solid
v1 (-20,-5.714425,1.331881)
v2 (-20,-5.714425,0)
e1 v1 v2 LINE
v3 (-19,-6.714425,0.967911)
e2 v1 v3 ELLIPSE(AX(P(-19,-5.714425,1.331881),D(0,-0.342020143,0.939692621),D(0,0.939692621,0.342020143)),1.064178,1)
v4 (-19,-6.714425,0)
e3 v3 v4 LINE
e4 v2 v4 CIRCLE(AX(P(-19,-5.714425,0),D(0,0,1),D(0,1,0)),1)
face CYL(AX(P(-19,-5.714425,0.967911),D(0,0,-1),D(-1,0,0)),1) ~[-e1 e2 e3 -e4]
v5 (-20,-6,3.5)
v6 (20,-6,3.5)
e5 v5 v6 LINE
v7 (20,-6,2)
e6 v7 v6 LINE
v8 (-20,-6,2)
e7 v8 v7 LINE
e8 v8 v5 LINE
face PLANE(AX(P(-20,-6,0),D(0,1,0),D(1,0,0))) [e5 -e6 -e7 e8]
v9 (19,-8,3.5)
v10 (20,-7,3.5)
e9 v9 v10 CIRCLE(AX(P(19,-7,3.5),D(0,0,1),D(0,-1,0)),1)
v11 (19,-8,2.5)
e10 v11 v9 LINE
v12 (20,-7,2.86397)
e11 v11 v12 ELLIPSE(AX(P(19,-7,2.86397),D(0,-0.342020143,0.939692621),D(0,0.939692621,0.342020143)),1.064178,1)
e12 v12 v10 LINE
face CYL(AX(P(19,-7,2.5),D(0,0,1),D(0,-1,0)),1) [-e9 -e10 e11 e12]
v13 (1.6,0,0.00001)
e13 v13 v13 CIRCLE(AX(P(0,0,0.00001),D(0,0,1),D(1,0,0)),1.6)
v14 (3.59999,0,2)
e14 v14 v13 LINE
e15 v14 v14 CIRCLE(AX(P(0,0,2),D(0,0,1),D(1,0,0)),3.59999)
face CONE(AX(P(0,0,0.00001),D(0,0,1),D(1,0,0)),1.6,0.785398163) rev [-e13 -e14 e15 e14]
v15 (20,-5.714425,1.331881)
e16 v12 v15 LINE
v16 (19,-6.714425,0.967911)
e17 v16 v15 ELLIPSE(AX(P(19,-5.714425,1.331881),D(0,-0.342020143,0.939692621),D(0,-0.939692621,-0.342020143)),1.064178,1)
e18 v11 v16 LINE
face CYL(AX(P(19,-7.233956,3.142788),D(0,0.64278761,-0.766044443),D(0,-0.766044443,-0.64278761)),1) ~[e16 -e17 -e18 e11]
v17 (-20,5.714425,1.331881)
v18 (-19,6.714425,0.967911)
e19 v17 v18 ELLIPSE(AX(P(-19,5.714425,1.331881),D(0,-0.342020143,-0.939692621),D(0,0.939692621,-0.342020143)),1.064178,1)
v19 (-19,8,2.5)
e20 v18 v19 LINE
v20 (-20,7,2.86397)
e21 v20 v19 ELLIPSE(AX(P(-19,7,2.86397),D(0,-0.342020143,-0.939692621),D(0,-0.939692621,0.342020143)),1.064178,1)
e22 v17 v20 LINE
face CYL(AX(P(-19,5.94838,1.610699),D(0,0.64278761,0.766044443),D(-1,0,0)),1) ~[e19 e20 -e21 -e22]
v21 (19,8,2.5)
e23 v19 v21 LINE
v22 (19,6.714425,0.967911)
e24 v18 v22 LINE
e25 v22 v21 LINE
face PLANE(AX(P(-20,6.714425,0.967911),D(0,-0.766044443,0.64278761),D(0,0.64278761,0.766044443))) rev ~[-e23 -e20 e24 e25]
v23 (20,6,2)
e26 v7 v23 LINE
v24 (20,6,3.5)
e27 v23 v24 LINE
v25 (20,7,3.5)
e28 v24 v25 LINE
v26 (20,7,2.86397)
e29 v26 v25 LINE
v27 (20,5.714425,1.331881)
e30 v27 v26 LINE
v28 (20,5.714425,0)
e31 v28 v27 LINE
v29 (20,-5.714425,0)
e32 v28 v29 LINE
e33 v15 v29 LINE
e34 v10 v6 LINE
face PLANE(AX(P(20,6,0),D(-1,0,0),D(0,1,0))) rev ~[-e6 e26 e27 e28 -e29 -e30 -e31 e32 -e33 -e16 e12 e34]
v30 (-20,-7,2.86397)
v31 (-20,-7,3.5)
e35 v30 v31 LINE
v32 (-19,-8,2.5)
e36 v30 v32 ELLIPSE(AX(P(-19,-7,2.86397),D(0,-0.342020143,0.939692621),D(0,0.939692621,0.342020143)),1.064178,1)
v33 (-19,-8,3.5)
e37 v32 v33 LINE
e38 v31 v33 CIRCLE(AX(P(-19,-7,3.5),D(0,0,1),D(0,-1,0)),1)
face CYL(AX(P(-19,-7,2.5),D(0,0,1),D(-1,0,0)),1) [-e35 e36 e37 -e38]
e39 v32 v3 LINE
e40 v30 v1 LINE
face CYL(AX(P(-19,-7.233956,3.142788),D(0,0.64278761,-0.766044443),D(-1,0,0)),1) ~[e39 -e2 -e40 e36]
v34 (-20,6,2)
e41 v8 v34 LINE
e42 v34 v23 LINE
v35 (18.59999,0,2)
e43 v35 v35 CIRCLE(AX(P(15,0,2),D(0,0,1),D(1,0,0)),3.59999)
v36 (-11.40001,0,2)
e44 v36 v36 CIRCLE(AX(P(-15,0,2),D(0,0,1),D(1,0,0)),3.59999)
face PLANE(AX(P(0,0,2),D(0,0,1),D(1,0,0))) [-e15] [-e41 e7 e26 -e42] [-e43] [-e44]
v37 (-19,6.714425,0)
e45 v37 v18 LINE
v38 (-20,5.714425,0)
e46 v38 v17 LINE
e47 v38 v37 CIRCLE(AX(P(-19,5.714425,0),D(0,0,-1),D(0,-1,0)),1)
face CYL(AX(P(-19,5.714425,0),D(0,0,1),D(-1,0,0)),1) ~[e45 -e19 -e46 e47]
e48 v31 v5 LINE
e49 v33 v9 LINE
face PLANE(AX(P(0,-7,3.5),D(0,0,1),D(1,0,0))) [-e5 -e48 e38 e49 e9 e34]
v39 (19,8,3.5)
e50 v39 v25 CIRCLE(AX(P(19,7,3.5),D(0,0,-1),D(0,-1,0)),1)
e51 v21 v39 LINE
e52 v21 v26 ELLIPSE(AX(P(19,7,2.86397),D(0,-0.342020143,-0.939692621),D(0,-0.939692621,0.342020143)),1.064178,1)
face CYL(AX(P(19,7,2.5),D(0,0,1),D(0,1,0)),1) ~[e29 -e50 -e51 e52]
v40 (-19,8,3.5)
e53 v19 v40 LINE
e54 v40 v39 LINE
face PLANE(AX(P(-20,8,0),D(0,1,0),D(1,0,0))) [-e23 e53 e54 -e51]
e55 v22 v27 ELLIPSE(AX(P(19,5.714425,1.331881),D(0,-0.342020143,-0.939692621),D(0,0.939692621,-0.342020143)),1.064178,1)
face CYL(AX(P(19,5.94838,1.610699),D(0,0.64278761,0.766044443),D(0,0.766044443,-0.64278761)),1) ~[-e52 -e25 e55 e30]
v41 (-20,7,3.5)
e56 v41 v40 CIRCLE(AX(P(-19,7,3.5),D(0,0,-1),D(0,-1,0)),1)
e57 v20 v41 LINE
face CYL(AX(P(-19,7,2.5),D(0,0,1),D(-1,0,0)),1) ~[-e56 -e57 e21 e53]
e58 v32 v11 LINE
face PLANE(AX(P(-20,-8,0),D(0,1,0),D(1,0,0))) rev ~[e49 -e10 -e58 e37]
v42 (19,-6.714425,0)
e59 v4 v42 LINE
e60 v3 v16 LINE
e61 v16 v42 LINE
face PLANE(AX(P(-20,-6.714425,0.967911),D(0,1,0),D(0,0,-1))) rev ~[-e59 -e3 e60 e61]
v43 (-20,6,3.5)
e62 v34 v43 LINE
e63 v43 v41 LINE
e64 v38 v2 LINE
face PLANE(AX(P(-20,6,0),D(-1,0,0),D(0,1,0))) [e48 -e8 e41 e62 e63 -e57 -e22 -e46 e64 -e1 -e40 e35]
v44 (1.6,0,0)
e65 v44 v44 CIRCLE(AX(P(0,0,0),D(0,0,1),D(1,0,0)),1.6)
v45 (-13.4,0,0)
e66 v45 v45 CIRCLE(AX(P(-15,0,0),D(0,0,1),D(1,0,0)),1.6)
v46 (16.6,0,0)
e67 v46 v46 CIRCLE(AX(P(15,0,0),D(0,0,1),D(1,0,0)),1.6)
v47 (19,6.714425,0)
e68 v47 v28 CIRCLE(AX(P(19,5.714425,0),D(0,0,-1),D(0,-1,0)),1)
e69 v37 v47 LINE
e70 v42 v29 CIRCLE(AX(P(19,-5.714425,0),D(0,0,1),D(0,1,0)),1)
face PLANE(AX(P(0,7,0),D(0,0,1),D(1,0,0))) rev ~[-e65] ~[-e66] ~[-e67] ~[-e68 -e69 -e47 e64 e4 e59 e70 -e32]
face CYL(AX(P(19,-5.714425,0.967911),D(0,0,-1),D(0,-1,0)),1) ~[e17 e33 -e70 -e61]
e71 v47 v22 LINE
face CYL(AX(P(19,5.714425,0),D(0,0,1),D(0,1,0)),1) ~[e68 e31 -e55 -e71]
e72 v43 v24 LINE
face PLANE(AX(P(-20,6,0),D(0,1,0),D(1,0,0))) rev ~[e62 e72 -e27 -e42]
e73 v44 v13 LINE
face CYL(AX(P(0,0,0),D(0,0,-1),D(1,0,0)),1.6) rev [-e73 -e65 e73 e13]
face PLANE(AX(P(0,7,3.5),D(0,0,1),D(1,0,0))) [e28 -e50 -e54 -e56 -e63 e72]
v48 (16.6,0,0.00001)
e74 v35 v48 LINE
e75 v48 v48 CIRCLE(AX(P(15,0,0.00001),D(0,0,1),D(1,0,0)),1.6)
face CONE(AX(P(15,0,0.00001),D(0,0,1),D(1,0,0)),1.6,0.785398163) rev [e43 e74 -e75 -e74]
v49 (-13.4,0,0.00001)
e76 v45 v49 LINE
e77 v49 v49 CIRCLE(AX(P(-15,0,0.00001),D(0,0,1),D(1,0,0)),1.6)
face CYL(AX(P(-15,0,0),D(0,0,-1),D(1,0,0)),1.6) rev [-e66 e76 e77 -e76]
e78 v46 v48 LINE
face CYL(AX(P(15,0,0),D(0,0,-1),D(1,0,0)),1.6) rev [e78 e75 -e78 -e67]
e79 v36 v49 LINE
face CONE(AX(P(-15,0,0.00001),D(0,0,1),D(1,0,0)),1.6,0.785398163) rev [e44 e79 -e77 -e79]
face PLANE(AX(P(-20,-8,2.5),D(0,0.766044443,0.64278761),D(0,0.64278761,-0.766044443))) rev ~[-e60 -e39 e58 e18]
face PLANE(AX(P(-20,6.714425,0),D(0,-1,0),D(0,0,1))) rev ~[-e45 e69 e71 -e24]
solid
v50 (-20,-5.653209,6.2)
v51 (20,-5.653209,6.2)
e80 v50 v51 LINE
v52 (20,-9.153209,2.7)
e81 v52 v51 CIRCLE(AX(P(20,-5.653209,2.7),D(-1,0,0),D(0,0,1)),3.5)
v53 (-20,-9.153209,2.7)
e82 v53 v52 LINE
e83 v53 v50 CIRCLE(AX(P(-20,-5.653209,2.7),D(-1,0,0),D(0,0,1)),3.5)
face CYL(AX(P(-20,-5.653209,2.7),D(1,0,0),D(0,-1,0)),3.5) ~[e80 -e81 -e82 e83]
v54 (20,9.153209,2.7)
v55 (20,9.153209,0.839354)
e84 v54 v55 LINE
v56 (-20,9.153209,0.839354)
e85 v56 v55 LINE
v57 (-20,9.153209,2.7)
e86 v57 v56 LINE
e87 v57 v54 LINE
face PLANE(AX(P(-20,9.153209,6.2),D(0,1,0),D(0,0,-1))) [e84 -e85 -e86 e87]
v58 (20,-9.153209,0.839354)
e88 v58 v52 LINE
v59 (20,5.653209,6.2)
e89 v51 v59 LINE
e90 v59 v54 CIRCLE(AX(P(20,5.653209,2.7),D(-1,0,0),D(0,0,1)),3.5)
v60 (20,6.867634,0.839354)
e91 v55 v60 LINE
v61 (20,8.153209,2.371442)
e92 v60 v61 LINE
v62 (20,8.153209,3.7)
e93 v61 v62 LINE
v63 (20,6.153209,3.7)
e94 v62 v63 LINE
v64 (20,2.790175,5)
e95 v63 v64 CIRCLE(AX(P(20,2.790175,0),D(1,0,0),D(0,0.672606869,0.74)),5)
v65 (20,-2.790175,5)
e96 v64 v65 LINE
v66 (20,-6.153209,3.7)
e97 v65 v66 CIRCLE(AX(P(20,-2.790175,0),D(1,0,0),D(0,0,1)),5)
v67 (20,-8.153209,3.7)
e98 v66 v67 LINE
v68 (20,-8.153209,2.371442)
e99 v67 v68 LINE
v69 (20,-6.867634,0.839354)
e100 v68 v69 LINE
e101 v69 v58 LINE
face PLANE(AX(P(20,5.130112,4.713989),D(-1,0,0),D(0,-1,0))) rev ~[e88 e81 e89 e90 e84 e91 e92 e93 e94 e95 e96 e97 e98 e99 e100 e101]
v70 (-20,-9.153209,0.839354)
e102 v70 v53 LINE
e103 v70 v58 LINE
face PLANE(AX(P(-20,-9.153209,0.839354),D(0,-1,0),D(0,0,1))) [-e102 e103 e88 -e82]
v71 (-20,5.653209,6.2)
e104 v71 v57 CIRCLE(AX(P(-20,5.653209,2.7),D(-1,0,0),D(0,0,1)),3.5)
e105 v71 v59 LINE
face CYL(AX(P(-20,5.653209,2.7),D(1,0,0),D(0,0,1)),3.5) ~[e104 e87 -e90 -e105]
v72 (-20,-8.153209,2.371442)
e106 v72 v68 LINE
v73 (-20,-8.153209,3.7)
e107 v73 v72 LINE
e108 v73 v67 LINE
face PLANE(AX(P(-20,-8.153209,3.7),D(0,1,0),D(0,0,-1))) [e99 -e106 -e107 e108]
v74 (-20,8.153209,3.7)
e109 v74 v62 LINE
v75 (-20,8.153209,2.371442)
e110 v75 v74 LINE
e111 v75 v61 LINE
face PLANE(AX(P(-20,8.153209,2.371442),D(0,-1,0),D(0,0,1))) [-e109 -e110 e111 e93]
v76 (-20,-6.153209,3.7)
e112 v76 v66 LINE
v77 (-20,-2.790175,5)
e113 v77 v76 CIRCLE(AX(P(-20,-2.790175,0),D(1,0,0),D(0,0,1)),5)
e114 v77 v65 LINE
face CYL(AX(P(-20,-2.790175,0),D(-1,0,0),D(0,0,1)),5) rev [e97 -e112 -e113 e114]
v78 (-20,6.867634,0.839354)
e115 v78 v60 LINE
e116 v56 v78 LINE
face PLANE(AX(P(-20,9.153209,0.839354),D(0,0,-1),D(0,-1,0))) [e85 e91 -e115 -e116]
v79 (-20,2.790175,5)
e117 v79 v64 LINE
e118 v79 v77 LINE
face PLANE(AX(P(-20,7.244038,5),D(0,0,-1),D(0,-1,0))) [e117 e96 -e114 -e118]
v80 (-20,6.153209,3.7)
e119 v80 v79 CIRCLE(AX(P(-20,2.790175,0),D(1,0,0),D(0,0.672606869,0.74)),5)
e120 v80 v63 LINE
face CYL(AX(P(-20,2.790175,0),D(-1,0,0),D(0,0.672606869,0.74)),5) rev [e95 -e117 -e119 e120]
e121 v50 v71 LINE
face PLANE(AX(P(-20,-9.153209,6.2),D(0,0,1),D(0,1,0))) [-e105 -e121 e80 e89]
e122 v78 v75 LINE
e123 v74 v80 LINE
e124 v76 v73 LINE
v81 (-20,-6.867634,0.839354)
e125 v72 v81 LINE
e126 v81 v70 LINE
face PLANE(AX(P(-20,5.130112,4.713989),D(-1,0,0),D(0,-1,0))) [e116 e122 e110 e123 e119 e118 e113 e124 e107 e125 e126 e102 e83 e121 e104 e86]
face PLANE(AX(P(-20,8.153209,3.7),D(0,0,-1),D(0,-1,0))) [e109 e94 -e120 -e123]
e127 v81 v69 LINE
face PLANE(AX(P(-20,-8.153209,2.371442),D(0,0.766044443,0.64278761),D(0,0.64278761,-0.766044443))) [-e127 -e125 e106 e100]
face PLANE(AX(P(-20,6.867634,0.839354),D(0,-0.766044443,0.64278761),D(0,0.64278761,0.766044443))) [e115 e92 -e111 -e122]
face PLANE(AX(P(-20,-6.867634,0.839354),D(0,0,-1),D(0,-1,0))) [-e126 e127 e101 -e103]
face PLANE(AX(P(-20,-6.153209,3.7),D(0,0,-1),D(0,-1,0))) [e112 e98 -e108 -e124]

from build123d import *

# Parameters (mm, degrees)
F1_W         = 40
F1_H         = 12
F1_R         = 1.6
F2_DEPTH     = 2
F1_H_2       = 2
F3_DEPTH     = 3.5
F5_DEPTH     = 282.2
F7_DEPTH     = 40
F8_R         = 1
F9_SIZE      = 1.99999
F10_T1_DEPTH = 40
F11_R        = 3.5


# Not quite as in the source:
# - a fillet or chamfer that OpenCascade refuses, or shapes differently, is made with other operations: its cross-section is extruded or revolved along the edge and cut away or added
# - a fillet or chamfer is up to 0.001 mm smaller than in the source, because OpenCascade refuses the exact size


with BuildPart() as f2:
    # F1 (on Top) → F2 (new body)
    with BuildSketch(Plane.XY):
        Rectangle(F1_W, F1_H)
        with Locations((-15, 0)):
            Circle(F1_R, mode=Mode.SUBTRACT)
        Circle(F1_R, mode=Mode.SUBTRACT)
        with Locations((15, 0)):
            Circle(F1_R, mode=Mode.SUBTRACT)
    extrude(amount=F2_DEPTH)

    # F1 (on Top) → F3 (join)
    with BuildSketch(Plane.XY):
        with Locations((0, 7)):
            Rectangle(F1_W, F1_H_2)
        with Locations((0, -7)):
            Rectangle(F1_W, F1_H_2)
    extrude(amount=F3_DEPTH)

    # F4 (on face) → F5 (cut)
    with BuildSketch(Plane(origin=(-20, 0, 0), x_dir=(0, -1, 0), z_dir=(-1, 0, 0))):
        Polygon((-6.7144247806, 0.9679111138), (-8, 2.5), (-8, 0), (-6.7144247806, 0), align=None)
        Polygon((6.7144247806, 0.9679111138), (6.7144247806, 0), (8, 0), (8, 2.5), align=None)
    extrude(amount=-F5_DEPTH, mode=Mode.SUBTRACT)

    # F8
    f8_edges = [f2.edges().sort_by_distance(p)[0] for p in [
        (20, -8, 3),
        (20, -6.714425, 0.483956),
        (20, -7.357212, 1.733956),
        (20, 8, 3),
        (20, 7.357212, 1.733956),
        (20, 6.714425, 0.483956),
        (-20, 8, 3),
        (-20, 7.357212, 1.733956),
        (-20, 6.714425, 0.483956),
        (-20, -7.357212, 1.733956),
        (-20, -6.714425, 0.483956),
        (-20, -8, 3),
    ]]
    fillet(f8_edges, radius=F8_R)

    # F9 (size 2 in the source; OpenCascade refuses exactly that, so slightly less here)
    f9_edges = [f2.edges().sort_by_distance(p)[0] for p in [
        (-16.6, 0, 2),
        (-1.6, 0, 2),
        (13.4, 0, 2),
    ]]
    chamfer(f9_edges, length=F9_SIZE)


with BuildPart() as f7:
    # F6 (on face) → F7 (new body)
    with BuildSketch(Plane(origin=(-20, 0, 0), x_dir=(0, -1, 0), z_dir=(-1, 0, 0))):
        Polygon((-6.8676336693, 0.8393535918), (-8.1532088886, 2.3714424781), (-8.1532088886, 3.7), (-8.1532088886, 5), (-7.2440384092, 5), (0, 5), (7.2440384092, 5), (8.1532088886, 5), (8.1532088886, 3.7), (8.1532088886, 2.3714424781), (6.8676336693, 0.8393535918), (9.1532088886, 0.8393535918), (9.1532088886, 6.2), (0, 6.2), (-9.1532088886, 6.2), (-9.1532088886, 0.8393535918), align=None)
        Polygon((-8.1532088886, 5), (-8.1532088886, 3.7), (-6.1532088886, 3.7), (-7.2440384092, 5), align=None)
        Polygon((8.1532088886, 5), (7.2440384092, 5), (6.1532088886, 3.7), (8.1532088886, 3.7), align=None)
    extrude(amount=-F7_DEPTH)

    # F10: fillet of radius 5 on 2 edges, made by hand

    # F10_s2 → F10_t1 (join)
    with BuildSketch(Plane.YZ.offset(-20)):
        with BuildLine():
            ThreePointArc((6.1532088886, 3.7), (4.5929501822, 4.6636895265), (2.7901745445, 5))
            Line((2.7901745445, 5), (7.2440384092, 5))
            Line((7.2440384092, 5), (6.1532088886, 3.7))
        make_face()
        with BuildLine():
            ThreePointArc((-2.7901745445, 5), (-4.5929501822, 4.6636895265), (-6.1532088886, 3.7))
            Line((-6.1532088886, 3.7), (-7.2440384092, 5))
            Line((-7.2440384092, 5), (-2.7901745445, 5))
        make_face()
    extrude(amount=F10_T1_DEPTH)

    # F11
    f11_edges = [f7.edges().sort_by_distance(p)[0] for p in [
        (0, -9.153209, 6.2),
        (0, 9.153209, 6.2),
    ]]
    fillet(f11_edges, radius=F11_R)


solid = Compound([f2.part, f7.part])
